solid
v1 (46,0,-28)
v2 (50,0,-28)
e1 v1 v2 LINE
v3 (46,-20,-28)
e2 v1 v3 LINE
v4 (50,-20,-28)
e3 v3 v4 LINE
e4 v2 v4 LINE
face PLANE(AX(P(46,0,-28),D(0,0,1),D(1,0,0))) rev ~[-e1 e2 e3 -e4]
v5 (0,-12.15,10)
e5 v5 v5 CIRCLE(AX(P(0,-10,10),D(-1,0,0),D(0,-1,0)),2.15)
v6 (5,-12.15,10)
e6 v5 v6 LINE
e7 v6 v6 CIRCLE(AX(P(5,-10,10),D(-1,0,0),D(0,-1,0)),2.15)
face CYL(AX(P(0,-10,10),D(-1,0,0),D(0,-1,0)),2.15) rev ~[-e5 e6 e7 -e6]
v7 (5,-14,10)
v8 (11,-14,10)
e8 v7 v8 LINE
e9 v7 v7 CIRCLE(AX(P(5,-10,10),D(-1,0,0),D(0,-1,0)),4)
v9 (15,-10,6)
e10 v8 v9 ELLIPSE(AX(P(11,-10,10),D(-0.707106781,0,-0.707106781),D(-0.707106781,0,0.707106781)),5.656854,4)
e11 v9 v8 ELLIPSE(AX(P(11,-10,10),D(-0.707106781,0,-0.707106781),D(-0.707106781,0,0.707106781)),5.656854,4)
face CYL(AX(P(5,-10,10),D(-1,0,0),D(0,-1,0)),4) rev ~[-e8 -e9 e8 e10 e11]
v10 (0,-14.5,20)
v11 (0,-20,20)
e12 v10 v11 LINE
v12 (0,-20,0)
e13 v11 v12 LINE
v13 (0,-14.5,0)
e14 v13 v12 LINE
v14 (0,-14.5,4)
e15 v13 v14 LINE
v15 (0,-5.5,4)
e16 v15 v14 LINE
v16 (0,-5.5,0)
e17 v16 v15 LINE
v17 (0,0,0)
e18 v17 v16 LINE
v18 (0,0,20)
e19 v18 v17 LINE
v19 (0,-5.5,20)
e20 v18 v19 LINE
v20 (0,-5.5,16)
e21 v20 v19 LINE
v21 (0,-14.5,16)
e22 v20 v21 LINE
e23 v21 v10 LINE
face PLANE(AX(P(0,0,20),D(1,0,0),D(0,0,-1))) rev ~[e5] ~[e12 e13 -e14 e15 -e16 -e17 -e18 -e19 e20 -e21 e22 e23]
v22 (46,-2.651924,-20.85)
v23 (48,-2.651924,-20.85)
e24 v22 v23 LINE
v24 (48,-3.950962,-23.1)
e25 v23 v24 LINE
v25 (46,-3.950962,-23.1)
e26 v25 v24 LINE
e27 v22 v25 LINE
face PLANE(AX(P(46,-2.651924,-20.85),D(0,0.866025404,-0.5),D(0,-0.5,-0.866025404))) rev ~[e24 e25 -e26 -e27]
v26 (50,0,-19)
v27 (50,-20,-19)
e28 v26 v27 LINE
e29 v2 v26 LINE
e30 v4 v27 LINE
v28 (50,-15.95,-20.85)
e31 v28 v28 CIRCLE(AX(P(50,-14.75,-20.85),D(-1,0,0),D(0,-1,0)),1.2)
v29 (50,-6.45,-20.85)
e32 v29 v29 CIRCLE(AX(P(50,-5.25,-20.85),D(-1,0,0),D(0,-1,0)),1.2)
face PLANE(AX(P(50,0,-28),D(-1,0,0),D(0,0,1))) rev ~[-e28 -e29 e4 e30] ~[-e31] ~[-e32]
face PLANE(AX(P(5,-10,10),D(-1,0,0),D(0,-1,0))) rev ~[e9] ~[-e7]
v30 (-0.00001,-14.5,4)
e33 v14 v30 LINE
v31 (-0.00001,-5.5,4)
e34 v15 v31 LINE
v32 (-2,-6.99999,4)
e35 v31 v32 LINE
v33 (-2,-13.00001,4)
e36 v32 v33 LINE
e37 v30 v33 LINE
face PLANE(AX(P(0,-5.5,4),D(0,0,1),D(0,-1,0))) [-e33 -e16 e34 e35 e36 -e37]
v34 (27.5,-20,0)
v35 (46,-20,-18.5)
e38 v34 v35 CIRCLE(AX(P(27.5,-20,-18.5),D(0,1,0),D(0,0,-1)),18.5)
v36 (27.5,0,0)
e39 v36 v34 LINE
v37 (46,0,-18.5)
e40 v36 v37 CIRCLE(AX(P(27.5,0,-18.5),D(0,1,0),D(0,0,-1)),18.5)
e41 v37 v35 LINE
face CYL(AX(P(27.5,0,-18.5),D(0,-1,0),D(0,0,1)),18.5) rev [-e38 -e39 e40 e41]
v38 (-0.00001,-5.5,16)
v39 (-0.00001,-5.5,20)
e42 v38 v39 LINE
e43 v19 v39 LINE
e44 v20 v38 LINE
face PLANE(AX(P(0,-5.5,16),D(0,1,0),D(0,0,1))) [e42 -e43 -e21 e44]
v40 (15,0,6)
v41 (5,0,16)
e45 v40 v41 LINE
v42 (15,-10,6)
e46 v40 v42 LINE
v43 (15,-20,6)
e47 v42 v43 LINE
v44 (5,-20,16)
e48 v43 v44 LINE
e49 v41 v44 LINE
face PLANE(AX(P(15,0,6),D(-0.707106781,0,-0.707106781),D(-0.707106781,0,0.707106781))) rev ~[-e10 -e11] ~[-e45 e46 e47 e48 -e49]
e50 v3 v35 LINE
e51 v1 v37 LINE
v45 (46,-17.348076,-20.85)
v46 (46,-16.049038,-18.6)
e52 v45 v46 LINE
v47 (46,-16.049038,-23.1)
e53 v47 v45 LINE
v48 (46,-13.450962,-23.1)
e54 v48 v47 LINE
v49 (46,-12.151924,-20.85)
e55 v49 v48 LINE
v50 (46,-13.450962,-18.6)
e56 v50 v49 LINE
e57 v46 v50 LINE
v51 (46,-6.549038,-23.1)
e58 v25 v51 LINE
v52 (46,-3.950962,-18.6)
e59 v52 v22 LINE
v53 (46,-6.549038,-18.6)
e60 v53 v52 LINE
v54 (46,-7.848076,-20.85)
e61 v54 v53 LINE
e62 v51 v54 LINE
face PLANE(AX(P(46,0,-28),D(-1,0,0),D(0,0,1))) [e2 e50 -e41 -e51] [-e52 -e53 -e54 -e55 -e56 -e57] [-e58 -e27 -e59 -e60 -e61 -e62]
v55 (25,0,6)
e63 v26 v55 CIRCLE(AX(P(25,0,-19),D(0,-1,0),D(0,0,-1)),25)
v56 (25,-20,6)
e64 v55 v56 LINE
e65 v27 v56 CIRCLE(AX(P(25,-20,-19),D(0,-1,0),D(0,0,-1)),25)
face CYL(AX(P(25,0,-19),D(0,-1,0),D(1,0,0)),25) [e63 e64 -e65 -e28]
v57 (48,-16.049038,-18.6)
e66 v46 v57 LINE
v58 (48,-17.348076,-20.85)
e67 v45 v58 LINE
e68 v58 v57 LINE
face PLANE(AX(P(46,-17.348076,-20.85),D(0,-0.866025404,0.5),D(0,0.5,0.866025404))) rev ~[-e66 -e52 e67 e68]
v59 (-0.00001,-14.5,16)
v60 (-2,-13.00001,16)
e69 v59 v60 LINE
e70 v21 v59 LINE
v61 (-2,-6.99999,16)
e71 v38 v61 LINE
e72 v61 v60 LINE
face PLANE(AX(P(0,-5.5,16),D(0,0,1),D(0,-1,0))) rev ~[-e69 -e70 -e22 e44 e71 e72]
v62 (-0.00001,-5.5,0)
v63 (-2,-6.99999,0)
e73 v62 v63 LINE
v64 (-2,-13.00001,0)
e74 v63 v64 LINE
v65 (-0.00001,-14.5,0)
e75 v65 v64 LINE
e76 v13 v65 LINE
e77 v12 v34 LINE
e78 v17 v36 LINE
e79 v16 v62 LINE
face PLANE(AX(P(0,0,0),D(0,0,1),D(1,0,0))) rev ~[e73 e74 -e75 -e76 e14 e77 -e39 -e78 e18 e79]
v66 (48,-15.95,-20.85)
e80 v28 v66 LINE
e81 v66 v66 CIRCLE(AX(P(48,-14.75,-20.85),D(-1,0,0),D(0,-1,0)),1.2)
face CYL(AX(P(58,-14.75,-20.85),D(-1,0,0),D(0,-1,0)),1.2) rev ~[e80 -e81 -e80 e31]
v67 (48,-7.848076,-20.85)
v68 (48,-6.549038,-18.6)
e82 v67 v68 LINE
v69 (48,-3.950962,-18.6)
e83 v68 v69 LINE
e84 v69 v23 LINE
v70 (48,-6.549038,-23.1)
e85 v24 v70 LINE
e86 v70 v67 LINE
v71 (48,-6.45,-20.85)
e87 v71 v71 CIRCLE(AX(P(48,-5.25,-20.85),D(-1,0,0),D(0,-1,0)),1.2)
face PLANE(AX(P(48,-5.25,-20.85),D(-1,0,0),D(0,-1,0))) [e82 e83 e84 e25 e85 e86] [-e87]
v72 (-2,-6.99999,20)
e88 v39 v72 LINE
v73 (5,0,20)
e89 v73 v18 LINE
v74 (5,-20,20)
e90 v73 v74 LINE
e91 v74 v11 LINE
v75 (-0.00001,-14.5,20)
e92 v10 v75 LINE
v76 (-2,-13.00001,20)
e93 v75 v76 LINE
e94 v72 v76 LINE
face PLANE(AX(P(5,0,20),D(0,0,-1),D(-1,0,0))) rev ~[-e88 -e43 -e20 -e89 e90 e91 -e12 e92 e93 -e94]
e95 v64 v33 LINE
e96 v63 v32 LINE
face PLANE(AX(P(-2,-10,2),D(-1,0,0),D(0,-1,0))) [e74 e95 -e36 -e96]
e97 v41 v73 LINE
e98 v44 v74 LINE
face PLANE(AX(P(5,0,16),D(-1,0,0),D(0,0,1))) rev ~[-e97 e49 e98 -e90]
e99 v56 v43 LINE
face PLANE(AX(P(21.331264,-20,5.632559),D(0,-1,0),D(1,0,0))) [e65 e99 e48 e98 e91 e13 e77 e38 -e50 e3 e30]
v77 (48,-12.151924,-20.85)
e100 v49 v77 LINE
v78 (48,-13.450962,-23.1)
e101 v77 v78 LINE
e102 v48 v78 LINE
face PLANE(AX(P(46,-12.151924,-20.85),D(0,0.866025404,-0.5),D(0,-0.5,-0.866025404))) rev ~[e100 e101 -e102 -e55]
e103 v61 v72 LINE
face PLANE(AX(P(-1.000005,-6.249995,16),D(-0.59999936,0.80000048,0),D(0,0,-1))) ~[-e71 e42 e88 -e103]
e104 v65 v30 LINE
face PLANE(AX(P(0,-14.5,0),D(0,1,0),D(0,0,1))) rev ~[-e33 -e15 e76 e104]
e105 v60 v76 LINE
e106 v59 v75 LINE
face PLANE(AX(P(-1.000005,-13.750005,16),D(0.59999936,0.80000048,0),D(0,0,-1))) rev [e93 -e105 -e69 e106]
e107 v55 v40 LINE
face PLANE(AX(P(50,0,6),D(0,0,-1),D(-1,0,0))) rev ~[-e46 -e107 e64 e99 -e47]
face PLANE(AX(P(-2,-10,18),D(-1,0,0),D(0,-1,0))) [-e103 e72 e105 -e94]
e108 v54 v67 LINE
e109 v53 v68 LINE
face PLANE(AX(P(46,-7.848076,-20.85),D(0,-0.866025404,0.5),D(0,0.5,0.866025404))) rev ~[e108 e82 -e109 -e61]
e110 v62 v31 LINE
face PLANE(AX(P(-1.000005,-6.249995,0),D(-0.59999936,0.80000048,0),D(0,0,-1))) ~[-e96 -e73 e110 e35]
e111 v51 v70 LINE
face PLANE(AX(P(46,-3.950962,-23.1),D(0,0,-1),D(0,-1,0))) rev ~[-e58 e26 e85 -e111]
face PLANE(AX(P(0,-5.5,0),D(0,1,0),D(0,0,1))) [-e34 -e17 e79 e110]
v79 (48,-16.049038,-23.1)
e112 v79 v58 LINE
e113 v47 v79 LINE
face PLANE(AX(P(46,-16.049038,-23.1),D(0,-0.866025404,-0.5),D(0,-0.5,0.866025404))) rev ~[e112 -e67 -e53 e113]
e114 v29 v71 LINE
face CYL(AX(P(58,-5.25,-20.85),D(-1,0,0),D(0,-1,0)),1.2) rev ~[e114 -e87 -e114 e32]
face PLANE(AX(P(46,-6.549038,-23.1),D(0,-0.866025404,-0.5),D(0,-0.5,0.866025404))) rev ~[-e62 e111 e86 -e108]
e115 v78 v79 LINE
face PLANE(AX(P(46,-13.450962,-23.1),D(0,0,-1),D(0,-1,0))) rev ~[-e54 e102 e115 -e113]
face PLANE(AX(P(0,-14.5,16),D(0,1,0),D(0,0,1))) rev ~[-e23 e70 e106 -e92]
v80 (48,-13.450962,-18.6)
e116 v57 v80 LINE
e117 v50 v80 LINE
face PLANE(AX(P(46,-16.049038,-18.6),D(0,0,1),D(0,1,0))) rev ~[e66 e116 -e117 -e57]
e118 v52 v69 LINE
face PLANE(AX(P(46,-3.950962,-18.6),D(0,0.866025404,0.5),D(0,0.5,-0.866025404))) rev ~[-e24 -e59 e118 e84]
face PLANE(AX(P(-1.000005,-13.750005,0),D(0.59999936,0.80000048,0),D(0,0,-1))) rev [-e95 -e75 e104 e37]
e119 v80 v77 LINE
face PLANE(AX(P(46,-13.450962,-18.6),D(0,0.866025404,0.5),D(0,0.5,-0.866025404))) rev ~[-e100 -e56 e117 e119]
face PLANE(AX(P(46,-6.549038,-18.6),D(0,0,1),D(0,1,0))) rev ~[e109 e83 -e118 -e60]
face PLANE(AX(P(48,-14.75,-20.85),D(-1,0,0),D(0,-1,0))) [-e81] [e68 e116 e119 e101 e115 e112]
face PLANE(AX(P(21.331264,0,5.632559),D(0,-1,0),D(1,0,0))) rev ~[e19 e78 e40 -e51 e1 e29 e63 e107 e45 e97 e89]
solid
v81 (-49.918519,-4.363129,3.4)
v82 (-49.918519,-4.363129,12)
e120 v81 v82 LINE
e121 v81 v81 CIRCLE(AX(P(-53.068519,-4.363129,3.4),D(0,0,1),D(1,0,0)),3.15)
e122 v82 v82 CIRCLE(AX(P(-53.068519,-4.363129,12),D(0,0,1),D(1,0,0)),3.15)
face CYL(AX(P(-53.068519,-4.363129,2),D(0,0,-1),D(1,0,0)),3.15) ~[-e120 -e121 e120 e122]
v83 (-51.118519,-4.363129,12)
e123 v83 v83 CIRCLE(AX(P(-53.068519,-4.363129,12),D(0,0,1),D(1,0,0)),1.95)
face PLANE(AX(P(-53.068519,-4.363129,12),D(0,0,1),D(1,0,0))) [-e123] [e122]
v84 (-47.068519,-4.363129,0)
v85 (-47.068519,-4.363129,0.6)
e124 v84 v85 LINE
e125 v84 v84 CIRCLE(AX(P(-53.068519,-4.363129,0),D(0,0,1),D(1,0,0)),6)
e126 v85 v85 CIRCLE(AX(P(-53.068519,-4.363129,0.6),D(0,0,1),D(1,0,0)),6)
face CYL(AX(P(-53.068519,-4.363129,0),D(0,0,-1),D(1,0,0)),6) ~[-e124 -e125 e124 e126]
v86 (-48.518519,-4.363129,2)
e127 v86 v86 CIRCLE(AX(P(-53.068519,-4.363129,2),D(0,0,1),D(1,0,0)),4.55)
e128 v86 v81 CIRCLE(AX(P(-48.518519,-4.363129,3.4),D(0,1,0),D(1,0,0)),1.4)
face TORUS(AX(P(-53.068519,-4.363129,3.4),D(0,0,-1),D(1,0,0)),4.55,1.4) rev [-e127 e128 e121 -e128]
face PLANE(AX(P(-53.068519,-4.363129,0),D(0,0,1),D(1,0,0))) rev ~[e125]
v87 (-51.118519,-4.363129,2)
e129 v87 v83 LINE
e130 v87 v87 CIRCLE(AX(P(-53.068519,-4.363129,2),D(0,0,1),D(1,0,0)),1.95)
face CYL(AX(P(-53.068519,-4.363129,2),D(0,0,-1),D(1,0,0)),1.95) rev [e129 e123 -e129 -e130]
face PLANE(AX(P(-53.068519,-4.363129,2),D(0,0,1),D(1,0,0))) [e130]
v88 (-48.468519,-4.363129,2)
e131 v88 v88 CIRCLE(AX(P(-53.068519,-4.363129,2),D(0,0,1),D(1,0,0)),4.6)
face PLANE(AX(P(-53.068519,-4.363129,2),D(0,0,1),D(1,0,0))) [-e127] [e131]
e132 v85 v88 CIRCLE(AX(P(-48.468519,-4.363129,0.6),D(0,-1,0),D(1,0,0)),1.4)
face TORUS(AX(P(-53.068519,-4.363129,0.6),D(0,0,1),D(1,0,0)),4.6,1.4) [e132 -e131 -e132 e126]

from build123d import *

# Parameters (mm, degrees)
F0_W       = 4
F0_H       = 28
F1_DEPTH   = 20
F2_R       = 2.15
F3_DEPTH   = 50.001
F4_START   = -5
F2_R_2     = 4
F4_DEPTH   = 45.001
F6_D       = 2.4
F6_DEPTH   = 8
F6_TIP     = 0.7210327428
F2_W       = 9
F2_H       = 4
F7_DEPTH   = 2
F8_SIZE2   = 1.49999
F8_SIZE    = 1.99999
F8_2_SIZE2 = 1.49999
F8_2_SIZE  = 1.99999
F9_SIZE2   = 1.49999
F9_SIZE    = 1.99999
F9_2_SIZE2 = 1.49999
F9_2_SIZE  = 1.99999
F11_DEPTH  = 2
F12_R      = 18.5
F13_R      = 25
F14_R      = 6
F15_DEPTH  = 2
F16_R      = 3.15
F16_R_2    = 1.95
F17_DEPTH  = 10
F18_R      = 1.4


# Not quite as in the source:
# - a fillet or chamfer is up to 0.001 mm smaller than in the source, because OpenCascade refuses the exact size
# - a feature names something its author has since deleted; it is built from what else it names


with BuildPart() as f1:
    # F0 (on Front) → F1 (new body)
    with BuildSketch(Plane.XZ):
        Polygon((0, 20), (0, 0), (46, 0), (50, 0), (50, 6), (15, 6), (5, 16), (5, 20), align=None)
        with Locations((48, -14)):
            Rectangle(F0_W, F0_H)
    extrude(amount=F1_DEPTH)

    # F2 (on face) → F3 (cut, through all)
    with BuildSketch(Plane(origin=(0, 0, 0), x_dir=(0, -1, 0), z_dir=(-1, 0, 0))):
        with Locations((10, 10)):
            Circle(F2_R)
    extrude(amount=-F3_DEPTH, mode=Mode.SUBTRACT)

    # F2 (on face) → F4 (cut)
    with BuildSketch(Plane(origin=(0, 0, 0), x_dir=(0, -1, 0), z_dir=(-1, 0, 0)).offset(F4_START)):
        with Locations((10, 10)):
            Circle(F2_R_2)
        with Locations((10, 10)):
            Circle(F2_R, mode=Mode.SUBTRACT)
    extrude(amount=-F4_DEPTH, mode=Mode.SUBTRACT)

    # F6
    with Locations(Plane.YZ.offset(50)):
        with Locations((-14.75, -20.85), (-5.25, -20.85)):
            Hole(F6_D / 2, depth=F6_DEPTH)
            with Locations((0, 0, -(F6_DEPTH + F6_TIP / 2))):  # 118° drill point
                Cone(0, F6_D / 2, F6_TIP, mode=Mode.SUBTRACT)

    # F2 (on face) → F7 (join)
    with BuildSketch(Plane(origin=(0, 0, 0), x_dir=(0, -1, 0), z_dir=(-1, 0, 0))):
        with Locations((10, 2)):
            Rectangle(F2_W, F2_H)
        with Locations((10, 18)):
            Rectangle(F2_W, F2_H)
    extrude(amount=F7_DEPTH)

    # F8 (size 2 and 1.5 in the source; OpenCascade refuses exactly that, so slightly less here)
    f8_edges = [f1.edges().sort_by_distance(p)[0] for p in [
        (-2, -5.5, 2),
    ]]
    f8_side = f1.faces().sort_by_distance((-1, -5.5, 2))[0]
    chamfer(f8_edges, length=F8_SIZE, length2=F8_SIZE2, reference=f8_side)

    # F8#2 (size 2 and 1.5 in the source; OpenCascade refuses exactly that, so slightly less here)
    f8_2_edges = [f1.edges().sort_by_distance(p)[0] for p in [
        (-2, -14.5, 2),
    ]]
    f8_2_side = f1.faces().sort_by_distance((-1, -14.5, 2))[0]
    chamfer(f8_2_edges, length=F8_2_SIZE, length2=F8_2_SIZE2, reference=f8_2_side)

    # F9 (size 2 and 1.5 in the source; OpenCascade refuses exactly that, so slightly less here)
    f9_edges = [f1.edges().sort_by_distance(p)[0] for p in [
        (-2, -14.5, 18),
    ]]
    f9_side = f1.faces().sort_by_distance((-1, -14.5, 18))[0]
    chamfer(f9_edges, length=F9_SIZE, length2=F9_SIZE2, reference=f9_side)

    # F9#2 (size 2 and 1.5 in the source; OpenCascade refuses exactly that, so slightly less here)
    f9_2_edges = [f1.edges().sort_by_distance(p)[0] for p in [
        (-2, -5.5, 18),
    ]]
    f9_2_side = f1.faces().sort_by_distance((-1, -5.5, 18))[0]
    chamfer(f9_2_edges, length=F9_2_SIZE, length2=F9_2_SIZE2, reference=f9_2_side)

    # F10 (on face) → F11 (cut)
    with BuildSketch(Plane(origin=(46, 0, 0), x_dir=(0, -1, 0), z_dir=(-1, 0, 0))):
        Polygon((6.5490381057, -23.1), (7.8480762114, -20.85), (6.5490381057, -18.6), (3.9509618943, -18.6), (2.6519237886, -20.85), (3.9509618943, -23.1), align=None)
        Polygon((12.1519237886, -20.85), (13.4509618943, -23.1), (16.0490381057, -23.1), (17.3480762114, -20.85), (16.0490381057, -18.6), (13.4509618943, -18.6), align=None)
    extrude(amount=-F11_DEPTH, mode=Mode.SUBTRACT)

    # F12
    f12_edges = [f1.edges().sort_by_distance(p)[0] for p in [
        (46, -10, 0),
    ]]
    fillet(f12_edges, radius=F12_R)

    # F13
    f13_edges = [f1.edges().sort_by_distance(p)[0] for p in [
        (50, -10, 6),
    ]]
    fillet(f13_edges, radius=F13_R)


with BuildPart() as f15:
    # F14 (on Top) → F15 (new body)
    with BuildSketch(Plane.XY):
        with Locations((-53.0685186386, -4.3631289154)):
            Circle(F14_R)
    extrude(amount=F15_DEPTH)

    # F16 (on face) → F17 (join)
    with BuildSketch(Plane.XY.offset(2)):
        with Locations((-53.0685186386, -4.3631289154)):
            Circle(F16_R)
        with Locations((-53.0685186386, -4.3631289154)):
            Circle(F16_R_2, mode=Mode.SUBTRACT)
    extrude(amount=F17_DEPTH)

    # F18
    f18_edges = [f15.edges().sort_by_distance(p)[0] for p in [
        (-56.218519, -4.363129, 2),
        (-59.068519, -4.363129, 2),
    ]]
    fillet(f18_edges, radius=F18_R)


solid = Compound([f1.part, f15.part])
